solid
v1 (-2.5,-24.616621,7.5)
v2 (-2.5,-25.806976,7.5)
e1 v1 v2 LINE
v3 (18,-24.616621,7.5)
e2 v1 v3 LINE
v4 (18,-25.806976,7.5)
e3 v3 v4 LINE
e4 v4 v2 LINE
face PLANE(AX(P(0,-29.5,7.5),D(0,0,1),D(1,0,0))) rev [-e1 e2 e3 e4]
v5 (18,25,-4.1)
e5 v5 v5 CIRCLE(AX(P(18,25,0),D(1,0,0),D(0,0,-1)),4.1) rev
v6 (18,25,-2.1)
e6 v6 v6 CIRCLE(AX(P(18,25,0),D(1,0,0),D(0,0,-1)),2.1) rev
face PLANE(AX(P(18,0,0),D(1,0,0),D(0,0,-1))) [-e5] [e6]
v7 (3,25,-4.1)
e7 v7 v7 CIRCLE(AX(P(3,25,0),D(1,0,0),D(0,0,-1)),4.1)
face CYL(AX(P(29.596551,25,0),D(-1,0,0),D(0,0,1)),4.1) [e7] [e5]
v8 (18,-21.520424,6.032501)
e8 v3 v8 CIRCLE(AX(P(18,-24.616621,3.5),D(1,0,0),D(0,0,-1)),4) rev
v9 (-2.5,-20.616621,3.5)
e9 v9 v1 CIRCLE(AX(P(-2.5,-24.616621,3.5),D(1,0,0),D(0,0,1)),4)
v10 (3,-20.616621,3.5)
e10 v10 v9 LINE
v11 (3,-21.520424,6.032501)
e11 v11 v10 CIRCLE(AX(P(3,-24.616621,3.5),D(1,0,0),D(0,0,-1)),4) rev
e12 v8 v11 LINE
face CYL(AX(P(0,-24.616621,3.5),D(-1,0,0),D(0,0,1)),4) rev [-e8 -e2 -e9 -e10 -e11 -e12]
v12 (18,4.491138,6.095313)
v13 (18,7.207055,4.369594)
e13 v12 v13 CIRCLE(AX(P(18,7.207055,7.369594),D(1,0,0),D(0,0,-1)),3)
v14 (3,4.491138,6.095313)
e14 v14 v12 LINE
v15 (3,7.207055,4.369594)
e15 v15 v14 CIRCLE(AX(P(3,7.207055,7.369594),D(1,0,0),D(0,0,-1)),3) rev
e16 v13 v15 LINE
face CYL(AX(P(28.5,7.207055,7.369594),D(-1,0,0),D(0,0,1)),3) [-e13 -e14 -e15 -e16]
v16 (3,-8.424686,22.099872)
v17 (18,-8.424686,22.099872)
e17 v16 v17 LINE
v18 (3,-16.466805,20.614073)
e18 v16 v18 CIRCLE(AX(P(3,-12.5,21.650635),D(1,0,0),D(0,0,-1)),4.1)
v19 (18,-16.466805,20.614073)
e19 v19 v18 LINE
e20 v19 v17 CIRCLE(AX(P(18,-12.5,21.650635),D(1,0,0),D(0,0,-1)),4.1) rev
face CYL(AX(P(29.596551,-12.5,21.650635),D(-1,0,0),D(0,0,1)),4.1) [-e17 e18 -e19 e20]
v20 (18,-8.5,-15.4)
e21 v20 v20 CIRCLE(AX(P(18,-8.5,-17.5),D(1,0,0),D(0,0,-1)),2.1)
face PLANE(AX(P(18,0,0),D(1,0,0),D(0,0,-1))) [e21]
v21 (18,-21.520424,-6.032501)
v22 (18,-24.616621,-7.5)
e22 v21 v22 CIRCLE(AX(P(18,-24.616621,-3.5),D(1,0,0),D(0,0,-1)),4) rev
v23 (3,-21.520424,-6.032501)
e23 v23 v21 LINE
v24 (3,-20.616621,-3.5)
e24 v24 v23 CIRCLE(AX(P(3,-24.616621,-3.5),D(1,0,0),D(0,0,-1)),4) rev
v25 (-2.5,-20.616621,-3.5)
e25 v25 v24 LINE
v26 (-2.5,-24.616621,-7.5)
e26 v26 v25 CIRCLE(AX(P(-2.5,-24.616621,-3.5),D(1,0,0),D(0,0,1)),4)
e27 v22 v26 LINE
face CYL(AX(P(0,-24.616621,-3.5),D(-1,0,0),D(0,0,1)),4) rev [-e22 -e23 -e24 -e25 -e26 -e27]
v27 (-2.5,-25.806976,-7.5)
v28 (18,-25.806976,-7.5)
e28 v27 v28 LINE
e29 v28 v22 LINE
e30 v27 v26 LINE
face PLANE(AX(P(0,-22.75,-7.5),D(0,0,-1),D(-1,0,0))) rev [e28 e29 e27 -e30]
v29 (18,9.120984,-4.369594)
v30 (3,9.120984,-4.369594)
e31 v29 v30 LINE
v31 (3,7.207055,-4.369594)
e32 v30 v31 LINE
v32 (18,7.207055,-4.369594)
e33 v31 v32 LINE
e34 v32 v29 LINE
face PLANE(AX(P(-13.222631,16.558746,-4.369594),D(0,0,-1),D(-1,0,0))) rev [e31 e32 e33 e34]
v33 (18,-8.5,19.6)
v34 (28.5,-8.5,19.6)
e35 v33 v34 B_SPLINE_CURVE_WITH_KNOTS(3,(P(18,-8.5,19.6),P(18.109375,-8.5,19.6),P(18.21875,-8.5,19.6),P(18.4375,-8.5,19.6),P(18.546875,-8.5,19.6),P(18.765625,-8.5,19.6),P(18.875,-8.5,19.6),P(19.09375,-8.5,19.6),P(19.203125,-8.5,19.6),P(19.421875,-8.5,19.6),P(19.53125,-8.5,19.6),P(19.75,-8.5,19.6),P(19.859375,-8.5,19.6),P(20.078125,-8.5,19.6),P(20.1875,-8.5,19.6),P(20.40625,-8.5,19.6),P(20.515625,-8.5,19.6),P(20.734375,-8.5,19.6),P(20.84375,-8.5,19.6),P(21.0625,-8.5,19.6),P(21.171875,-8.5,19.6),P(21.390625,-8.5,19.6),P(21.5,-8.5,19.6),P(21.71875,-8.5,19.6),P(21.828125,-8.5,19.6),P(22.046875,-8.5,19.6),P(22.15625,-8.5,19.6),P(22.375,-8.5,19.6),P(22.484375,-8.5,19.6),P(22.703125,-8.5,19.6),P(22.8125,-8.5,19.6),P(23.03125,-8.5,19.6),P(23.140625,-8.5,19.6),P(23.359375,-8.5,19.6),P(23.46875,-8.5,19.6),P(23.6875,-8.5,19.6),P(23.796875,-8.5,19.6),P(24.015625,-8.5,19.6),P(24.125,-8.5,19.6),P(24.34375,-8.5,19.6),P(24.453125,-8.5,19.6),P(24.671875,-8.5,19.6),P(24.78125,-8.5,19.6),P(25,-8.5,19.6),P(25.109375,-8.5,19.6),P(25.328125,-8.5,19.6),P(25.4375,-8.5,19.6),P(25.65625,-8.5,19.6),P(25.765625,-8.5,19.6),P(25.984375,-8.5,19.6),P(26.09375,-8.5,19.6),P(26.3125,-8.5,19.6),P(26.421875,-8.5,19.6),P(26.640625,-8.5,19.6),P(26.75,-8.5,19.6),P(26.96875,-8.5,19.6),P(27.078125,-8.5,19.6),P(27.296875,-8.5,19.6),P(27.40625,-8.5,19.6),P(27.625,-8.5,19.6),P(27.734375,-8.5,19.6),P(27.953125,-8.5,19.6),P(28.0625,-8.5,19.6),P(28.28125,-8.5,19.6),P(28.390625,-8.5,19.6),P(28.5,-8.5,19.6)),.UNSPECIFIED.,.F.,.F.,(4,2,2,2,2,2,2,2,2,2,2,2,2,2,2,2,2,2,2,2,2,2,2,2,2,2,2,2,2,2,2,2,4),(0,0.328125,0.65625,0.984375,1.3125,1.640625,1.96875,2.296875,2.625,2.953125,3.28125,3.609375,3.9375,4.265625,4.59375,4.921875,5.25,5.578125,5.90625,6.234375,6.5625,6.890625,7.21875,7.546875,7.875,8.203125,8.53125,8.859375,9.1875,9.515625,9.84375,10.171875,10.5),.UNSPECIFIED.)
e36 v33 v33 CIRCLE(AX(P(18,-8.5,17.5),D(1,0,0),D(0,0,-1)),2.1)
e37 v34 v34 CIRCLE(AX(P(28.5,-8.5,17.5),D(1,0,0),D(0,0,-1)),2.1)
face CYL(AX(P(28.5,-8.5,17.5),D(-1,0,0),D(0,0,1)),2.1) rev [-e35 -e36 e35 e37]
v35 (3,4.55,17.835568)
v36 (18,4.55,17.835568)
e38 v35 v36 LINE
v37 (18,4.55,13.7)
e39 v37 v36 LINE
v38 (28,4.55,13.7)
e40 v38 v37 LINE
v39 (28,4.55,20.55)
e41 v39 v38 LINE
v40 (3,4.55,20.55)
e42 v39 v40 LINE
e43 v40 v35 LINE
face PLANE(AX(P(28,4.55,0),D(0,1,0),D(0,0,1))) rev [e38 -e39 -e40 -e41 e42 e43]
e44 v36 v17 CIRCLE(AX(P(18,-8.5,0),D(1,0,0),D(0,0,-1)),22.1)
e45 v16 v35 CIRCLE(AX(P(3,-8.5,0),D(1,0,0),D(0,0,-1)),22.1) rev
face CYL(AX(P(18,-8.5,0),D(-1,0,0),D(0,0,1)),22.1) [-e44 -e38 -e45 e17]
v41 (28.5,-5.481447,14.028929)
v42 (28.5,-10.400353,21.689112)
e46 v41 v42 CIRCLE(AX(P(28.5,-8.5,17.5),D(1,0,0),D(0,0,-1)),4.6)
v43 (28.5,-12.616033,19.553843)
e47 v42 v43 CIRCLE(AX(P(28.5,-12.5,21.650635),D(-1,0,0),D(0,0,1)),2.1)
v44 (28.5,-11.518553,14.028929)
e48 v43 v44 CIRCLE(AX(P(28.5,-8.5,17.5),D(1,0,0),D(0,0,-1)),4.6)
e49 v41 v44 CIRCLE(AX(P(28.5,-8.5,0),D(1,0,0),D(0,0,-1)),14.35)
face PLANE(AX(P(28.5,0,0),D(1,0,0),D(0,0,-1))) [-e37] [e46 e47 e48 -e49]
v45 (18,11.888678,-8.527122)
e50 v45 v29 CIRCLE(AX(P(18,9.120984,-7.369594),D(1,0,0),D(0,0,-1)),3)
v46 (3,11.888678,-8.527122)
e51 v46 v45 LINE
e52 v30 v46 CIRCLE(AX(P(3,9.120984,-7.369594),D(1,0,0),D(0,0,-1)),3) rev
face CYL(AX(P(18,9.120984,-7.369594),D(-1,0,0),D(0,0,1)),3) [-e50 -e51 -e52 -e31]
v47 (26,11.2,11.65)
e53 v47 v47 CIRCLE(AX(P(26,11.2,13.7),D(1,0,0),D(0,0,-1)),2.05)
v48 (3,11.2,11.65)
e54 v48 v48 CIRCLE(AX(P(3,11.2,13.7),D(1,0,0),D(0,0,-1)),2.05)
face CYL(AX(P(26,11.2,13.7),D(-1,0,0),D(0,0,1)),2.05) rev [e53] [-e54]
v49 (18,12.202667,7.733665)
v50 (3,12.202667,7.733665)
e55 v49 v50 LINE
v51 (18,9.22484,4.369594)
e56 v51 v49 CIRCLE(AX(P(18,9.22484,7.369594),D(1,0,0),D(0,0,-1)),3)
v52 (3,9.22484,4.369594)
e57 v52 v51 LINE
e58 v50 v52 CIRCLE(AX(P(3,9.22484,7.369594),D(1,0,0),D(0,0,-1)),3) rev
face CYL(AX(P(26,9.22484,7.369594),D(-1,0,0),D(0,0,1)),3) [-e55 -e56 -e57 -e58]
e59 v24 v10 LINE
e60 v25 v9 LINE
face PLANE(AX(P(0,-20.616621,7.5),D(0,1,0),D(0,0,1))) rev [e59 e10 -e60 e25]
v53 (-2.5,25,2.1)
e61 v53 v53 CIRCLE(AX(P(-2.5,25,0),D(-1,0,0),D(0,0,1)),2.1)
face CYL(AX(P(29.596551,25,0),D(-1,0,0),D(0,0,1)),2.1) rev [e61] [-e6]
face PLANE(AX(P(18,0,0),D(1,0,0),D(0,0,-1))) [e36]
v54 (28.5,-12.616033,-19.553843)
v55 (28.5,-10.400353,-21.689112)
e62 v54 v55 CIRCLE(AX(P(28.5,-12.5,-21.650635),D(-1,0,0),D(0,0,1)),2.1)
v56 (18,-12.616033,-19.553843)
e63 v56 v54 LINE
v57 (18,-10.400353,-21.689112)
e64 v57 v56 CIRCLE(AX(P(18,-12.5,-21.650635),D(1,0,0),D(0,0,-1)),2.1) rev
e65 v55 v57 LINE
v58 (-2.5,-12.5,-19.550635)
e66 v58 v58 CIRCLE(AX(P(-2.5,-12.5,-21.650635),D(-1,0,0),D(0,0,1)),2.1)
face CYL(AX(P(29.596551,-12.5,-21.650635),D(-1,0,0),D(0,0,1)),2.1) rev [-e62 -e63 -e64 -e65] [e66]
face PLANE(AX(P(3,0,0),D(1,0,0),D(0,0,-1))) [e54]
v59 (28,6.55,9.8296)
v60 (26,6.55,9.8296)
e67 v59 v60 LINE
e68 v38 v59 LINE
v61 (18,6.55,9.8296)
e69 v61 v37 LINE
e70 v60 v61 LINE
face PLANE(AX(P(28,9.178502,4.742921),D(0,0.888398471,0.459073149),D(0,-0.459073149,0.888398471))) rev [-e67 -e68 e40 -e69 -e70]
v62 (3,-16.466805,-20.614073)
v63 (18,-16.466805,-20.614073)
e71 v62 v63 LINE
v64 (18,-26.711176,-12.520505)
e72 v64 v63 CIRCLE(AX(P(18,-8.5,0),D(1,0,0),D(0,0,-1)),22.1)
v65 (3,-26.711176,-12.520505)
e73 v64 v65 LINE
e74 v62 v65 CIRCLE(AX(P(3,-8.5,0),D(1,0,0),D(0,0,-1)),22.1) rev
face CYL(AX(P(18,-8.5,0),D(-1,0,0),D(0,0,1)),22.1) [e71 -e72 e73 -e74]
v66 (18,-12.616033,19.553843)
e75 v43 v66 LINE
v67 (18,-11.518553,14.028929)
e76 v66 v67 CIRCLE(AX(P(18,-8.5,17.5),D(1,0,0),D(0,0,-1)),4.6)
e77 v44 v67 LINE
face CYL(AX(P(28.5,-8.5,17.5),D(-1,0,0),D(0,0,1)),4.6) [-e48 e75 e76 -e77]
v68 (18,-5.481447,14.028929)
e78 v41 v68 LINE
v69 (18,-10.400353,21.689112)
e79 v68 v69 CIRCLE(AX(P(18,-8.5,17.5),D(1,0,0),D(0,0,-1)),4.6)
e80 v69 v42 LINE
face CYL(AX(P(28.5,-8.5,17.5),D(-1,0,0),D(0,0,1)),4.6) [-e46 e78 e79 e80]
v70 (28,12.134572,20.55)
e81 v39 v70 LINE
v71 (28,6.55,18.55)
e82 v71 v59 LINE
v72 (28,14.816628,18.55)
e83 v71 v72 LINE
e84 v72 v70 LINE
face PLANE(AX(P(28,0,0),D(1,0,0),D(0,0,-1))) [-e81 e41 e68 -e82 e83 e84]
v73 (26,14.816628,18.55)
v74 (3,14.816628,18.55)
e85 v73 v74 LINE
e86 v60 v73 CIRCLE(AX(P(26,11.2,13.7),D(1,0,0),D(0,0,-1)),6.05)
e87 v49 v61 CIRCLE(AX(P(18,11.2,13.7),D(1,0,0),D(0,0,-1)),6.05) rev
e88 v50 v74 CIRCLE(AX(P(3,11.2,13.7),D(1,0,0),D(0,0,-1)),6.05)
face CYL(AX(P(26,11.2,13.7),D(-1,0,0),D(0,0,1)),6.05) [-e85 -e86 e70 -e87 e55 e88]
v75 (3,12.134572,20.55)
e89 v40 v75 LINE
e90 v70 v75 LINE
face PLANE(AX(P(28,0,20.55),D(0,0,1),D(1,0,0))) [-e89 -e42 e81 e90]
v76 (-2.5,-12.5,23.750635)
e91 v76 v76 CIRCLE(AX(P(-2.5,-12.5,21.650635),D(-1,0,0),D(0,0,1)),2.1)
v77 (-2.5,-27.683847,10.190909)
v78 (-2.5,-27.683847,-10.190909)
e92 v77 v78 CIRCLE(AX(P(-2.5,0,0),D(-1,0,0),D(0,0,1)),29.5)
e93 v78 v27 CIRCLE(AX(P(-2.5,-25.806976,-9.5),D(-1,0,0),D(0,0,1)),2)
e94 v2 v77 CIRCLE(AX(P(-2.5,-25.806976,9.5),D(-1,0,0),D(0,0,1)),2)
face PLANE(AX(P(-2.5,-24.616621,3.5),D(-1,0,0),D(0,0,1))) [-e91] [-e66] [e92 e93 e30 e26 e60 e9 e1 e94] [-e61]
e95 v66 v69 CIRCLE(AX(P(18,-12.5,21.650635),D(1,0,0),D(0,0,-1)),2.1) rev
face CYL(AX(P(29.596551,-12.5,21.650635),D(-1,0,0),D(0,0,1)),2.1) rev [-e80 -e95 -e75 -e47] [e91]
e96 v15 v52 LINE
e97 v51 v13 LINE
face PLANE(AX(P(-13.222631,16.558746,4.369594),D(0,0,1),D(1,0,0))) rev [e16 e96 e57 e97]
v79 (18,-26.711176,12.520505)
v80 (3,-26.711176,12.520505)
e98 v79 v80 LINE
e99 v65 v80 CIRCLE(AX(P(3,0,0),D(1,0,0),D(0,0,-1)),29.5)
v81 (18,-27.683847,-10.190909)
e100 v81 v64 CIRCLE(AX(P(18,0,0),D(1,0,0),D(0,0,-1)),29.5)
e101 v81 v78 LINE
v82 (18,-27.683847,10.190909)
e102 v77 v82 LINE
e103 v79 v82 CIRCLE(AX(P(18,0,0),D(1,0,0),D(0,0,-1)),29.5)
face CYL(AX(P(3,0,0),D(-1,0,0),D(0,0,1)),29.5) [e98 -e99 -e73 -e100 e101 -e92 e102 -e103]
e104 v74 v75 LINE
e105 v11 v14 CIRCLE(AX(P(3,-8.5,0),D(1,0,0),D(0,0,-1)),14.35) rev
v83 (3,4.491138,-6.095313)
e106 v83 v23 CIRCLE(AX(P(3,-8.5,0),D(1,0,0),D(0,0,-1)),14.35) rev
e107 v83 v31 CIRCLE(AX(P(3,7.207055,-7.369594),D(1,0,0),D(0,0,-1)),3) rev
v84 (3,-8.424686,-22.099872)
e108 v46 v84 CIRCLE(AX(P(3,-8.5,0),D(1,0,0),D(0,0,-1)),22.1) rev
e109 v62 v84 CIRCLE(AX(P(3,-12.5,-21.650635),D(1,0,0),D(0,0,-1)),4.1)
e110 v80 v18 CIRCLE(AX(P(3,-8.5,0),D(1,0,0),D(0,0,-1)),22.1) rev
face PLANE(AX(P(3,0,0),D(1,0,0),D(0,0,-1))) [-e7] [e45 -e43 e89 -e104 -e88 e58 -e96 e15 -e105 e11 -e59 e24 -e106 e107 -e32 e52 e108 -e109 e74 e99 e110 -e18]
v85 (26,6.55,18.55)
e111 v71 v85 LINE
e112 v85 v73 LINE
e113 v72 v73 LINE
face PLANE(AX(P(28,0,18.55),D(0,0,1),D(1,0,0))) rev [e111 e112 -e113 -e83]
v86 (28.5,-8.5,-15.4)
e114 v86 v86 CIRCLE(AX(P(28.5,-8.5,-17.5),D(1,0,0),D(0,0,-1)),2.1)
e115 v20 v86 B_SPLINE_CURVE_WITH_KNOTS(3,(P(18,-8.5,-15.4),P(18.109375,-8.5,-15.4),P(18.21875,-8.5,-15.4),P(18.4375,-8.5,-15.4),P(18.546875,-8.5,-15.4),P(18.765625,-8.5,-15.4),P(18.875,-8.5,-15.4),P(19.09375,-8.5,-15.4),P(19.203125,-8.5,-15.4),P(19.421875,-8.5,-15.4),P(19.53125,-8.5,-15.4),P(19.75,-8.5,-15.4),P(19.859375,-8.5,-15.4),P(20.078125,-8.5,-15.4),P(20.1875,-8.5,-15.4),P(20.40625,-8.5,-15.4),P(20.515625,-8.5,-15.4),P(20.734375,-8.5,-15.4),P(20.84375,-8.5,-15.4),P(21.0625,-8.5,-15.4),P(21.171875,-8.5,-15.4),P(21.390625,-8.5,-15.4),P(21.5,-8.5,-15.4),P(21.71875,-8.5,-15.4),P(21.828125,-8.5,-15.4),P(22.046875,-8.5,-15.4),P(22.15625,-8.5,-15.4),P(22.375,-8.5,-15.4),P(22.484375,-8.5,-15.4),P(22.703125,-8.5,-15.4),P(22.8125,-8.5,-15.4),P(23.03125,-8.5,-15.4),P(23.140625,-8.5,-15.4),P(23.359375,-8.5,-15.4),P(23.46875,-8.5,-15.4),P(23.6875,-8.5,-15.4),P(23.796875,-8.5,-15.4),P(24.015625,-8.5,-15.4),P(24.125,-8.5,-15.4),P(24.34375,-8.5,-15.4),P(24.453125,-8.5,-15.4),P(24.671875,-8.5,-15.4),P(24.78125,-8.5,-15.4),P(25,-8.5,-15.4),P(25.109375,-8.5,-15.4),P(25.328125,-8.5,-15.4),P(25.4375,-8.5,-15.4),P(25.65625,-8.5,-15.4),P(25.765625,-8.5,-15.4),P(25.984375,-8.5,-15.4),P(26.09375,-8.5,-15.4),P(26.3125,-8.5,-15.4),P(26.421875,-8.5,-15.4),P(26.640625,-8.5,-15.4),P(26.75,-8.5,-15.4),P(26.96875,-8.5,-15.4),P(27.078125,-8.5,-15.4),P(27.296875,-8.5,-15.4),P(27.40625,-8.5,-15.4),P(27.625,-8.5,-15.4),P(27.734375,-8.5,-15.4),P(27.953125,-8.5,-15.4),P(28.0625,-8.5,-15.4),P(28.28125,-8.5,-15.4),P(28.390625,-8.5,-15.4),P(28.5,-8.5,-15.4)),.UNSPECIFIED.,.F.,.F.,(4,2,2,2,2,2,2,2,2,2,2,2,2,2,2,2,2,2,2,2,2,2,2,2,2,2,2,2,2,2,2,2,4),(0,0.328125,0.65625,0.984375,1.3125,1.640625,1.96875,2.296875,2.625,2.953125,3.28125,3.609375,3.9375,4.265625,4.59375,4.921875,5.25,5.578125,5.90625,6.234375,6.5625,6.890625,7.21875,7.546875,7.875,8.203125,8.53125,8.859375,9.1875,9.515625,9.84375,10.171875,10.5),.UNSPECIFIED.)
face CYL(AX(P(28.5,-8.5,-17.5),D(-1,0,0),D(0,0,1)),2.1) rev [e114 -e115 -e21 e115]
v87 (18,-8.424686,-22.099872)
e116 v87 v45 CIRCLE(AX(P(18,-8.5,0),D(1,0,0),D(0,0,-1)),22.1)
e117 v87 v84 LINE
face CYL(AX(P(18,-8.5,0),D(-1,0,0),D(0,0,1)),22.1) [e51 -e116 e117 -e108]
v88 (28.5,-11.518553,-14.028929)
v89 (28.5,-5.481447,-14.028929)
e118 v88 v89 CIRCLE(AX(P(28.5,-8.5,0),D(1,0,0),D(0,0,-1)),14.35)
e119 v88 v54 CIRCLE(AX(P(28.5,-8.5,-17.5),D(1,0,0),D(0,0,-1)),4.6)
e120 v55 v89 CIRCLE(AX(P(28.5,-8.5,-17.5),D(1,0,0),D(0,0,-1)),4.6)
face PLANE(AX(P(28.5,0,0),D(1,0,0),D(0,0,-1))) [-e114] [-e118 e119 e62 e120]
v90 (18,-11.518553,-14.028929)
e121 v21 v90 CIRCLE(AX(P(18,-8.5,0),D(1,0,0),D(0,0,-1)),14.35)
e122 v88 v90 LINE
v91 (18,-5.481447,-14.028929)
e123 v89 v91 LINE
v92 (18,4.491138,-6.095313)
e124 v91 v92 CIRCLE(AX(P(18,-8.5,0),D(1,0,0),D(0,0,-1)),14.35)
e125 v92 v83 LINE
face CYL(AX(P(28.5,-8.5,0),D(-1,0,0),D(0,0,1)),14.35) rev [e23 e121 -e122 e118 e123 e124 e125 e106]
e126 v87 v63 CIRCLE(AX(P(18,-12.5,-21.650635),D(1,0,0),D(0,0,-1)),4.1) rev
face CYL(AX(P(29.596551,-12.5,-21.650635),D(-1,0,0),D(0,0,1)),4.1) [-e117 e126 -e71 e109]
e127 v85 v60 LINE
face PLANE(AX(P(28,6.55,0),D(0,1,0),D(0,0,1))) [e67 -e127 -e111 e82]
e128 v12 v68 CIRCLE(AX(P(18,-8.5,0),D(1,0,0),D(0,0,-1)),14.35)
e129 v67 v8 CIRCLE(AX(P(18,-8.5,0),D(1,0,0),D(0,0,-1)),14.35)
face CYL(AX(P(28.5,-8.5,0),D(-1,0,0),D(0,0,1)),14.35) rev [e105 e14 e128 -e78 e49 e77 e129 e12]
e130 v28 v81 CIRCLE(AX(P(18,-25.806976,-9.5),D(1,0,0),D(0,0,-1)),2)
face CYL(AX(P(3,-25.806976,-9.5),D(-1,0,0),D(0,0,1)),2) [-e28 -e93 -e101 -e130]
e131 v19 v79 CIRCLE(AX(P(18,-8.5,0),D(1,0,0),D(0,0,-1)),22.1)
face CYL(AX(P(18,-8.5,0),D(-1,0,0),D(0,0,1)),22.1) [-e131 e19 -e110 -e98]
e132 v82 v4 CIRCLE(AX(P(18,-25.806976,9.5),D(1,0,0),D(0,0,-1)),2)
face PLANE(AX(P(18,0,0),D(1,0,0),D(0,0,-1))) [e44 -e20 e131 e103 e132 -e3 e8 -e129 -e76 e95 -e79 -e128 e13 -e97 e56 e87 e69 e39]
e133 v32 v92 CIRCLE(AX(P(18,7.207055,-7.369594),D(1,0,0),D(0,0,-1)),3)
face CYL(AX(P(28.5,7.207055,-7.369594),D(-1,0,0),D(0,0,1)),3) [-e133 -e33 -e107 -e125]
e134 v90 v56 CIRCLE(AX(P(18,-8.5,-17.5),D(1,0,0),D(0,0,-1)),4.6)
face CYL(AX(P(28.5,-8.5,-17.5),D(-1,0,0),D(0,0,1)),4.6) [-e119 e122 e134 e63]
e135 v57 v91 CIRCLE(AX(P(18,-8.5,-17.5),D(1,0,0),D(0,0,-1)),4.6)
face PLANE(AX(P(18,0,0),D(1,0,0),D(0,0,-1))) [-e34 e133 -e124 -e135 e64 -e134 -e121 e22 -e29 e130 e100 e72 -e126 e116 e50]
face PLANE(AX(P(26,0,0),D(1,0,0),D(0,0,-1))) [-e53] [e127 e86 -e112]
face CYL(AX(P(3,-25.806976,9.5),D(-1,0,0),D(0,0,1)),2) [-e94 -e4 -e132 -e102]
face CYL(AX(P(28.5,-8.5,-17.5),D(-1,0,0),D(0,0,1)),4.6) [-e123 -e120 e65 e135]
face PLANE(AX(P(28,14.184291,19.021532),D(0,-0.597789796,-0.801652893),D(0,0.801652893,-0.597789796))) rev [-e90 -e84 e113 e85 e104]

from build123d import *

# Parameters (mm, degrees)
SKETCH1_R            = 29.5
BOSS_EXTRUDE1_DEPTH  = 3
SKETCH1_3_R          = 2.1
BOSS_EXTRUDE2_DEPTH  = 28.5
SKETCH1_4_R          = 2.1
BOSS_EXTRUDE3_DEPTH  = 18
BOSS_EXTRUDE4_DEPTH  = 18
SKETCH3_R            = 4.1
SKETCH3_R_2          = 2.1
BOSS_EXTRUDE5_DEPTH  = 18
SKETCH3_2_R          = 2.1
CUT_EXTRUDE1_DEPTH   = 51.524746412
CUT_EXTRUDE4_DEPTH   = 46.436769251
FILLET1_R            = 4
FILLET2_R            = 2
BOSS_EXTRUDE6_START  = 2.5
SKETCH5_R            = 2.1
BOSS_EXTRUDE6_DEPTH  = 2.5
BOSS_EXTRUDE8_DEPTH  = 23
BOSS_EXTRUDE10_DEPTH = 25
CUT_EXTRUDE5_START   = -23
SKETCH8_R            = 2.05
CUT_EXTRUDE5_DEPTH   = 23
SKETCH9_W            = 8.73918865
SKETCH9_H            = 13.66749207
CUT_EXTRUDE6_DEPTH   = 15
FILLET6_R            = 3


with BuildPart() as part:
    # Sketch1 → Boss-Extrude1 (new body)
    with BuildSketch(Plane(origin=(0, 0, 0), x_dir=(0, 0, -1), z_dir=(1, 0, 0))):
        Circle(SKETCH1_R)
    extrude(amount=BOSS_EXTRUDE1_DEPTH)

    # Sketch1<3> → Boss-Extrude2 (add)
    # profile 1 of 2: a face of its own
    with BuildSketch(Plane(origin=(0, 0, 0), x_dir=(0, 0, -1), z_dir=(1, 0, 0))):
        with BuildLine():
            ThreePointArc((-14.028928571, -5.481446847), (-22.1, -8.5), (-14.028928571, -11.518553153))
            ThreePointArc((-14.028928571, -11.518553153), (-14.35, -8.5), (-14.028928571, -5.481446847))
        make_face()
        with Locations(Location((-17.5, -8.5, 0), (0, 0, 180))):
            Circle(SKETCH1_3_R, mode=Mode.SUBTRACT)
    # profile 2 of 2: a face of its own
    with BuildSketch(Plane(origin=(0, 0, 0), x_dir=(0, 0, -1), z_dir=(1, 0, 0))):
        with BuildLine():
            ThreePointArc((14.028928571, -11.518553153), (22.1, -8.5), (14.028928571, -5.481446847))
            ThreePointArc((14.028928571, -5.481446847), (14.35, -8.5), (14.028928571, -11.518553153))
        make_face()
        with Locations(Location((17.5, -8.5, 0), (0, 0, 180))):
            Circle(SKETCH1_3_R, mode=Mode.SUBTRACT)
    extrude(amount=BOSS_EXTRUDE2_DEPTH)

    # Sketch1<4> → Boss-Extrude3 (add)
    with BuildSketch(Plane(origin=(0, 0, 0), x_dir=(0, 0, -1), z_dir=(1, 0, 0))):
        with BuildLine():
            ThreePointArc((-22.1, -8.5), (-19.559053733, -18.788508981), (-12.520505244, -26.711176471))
            ThreePointArc((-12.520505244, -26.711176471), (0, -29.5), (12.520505244, -26.711176471))
            ThreePointArc((12.520505244, -26.711176471), (19.559053733, -18.788508981), (22.1, -8.5))
            ThreePointArc((22.1, -8.5), (19.111376962, -12.808533891), (14.028928571, -11.518553153))
            ThreePointArc((14.028928571, -11.518553153), (0, -22.85), (-14.028928571, -11.518553153))
            ThreePointArc((-14.028928571, -11.518553153), (-19.111376962, -12.808533891), (-22.1, -8.5))
        make_face()
        with Locations((-17.5, -8.5)):
            Circle(SKETCH1_4_R)
        with Locations((17.5, -8.5)):
            Circle(SKETCH1_4_R)
    extrude(amount=BOSS_EXTRUDE3_DEPTH)

    # Sketch1<5> → Boss-Extrude4 (add)
    with BuildSketch(Plane(origin=(0, 0, 0), x_dir=(0, 0, -1), z_dir=(1, 0, 0))):
        with BuildLine():
            ThreePointArc((22.1, -8.5), (0, 13.6), (-22.1, -8.5))
            ThreePointArc((-22.1, -8.5), (-19.111376962, -4.191466109), (-14.028928571, -5.481446847))
            ThreePointArc((-14.028928571, -5.481446847), (0, 5.85), (14.028928571, -5.481446847))
            ThreePointArc((14.028928571, -5.481446847), (19.111376962, -4.191466109), (22.1, -8.5))
        make_face()
    extrude(amount=BOSS_EXTRUDE4_DEPTH)

    # Sketch3 → Boss-Extrude5 (add)
    # profile 1 of 3: a face of its own
    with BuildSketch(Plane.ZY):
        with Locations(Location((0, 25, 0), (0, 0, 180))):
            Circle(SKETCH3_R)
        with Locations(Location((0, 25, 0), (0, 0, 180))):
            Circle(SKETCH3_R_2, mode=Mode.SUBTRACT)
    # profile 2 of 3: a face of its own
    with BuildSketch(Plane.ZY):
        with Locations((21.650635095, -12.5)):
            Circle(SKETCH3_R)
        with Locations((21.650635095, -12.5)):
            Circle(SKETCH3_R_2, mode=Mode.SUBTRACT)
    # profile 3 of 3: a face of its own
    with BuildSketch(Plane.ZY):
        with Locations((-21.650635095, -12.5)):
            Circle(SKETCH3_R)
        with Locations((-21.650635095, -12.5)):
            Circle(SKETCH3_R_2, mode=Mode.SUBTRACT)
    extrude(amount=-BOSS_EXTRUDE5_DEPTH)

    # Sketch3<2> → Cut-Extrude1 (cut, through all)
    with BuildSketch(Plane.ZY):
        with Locations((-21.650635095, -12.5)):
            Circle(SKETCH3_2_R)
        with BuildLine():
            ThreePointArc((0, 27.1), (-2.1, 25), (0, 22.9))
            Line((0, 22.9), (0, 27.1))
        make_face()
        with BuildLine():
            Line((0, 27.1), (0, 22.9))
            ThreePointArc((0, 22.9), (1.48492424, 23.51507576), (2.1, 25))
            ThreePointArc((2.1, 25), (1.48492424, 26.48492424), (0, 27.1))
        make_face()
        with Locations((21.650635095, -12.5)):
            Circle(SKETCH3_2_R)
    extrude(amount=-CUT_EXTRUDE1_DEPTH, mode=Mode.SUBTRACT)

    # Sketch4 → Cut-Extrude4 (cut, through all)
    with BuildSketch(Plane(origin=(18, 0, 0), x_dir=(0, 0, -1), z_dir=(1, 0, 0))):
        Polygon((-7.5, -22.75), (-7.5, -29.5), (-7.5, -30.430558557), (7.5, -30.430558557), (7.5, -29.5), (7.5, -22.75), (7.5, -20.616620816), (-7.5, -20.616620816), align=None)
    extrude(amount=-CUT_EXTRUDE4_DEPTH, mode=Mode.SUBTRACT)

    # Fillet1
    # the kernel refuses this fillet: 4 mm, written as the material it adds along each edge
    with BuildSketch(Plane(origin=(27, -20.616620816, -7.5), x_dir=(0, 0, 1), z_dir=(-1, 0, 0))) as fillet1_piece_1_section:
        with BuildLine():
            CenterArc((FILLET1_R, -FILLET1_R), FILLET1_R, 90, 90)
            Line((0, -FILLET1_R), (-FILLET1_R * 0.02, -FILLET1_R))
            Line((-FILLET1_R * 0.02, -FILLET1_R), (-FILLET1_R * 0.02, FILLET1_R * 0.02))
            Line((-FILLET1_R * 0.02, FILLET1_R * 0.02), (FILLET1_R, FILLET1_R * 0.02))
            Line((FILLET1_R, FILLET1_R * 0.02), (FILLET1_R, 0))
        make_face()
    fillet1_piece_1 = extrude(amount=27, mode=Mode.PRIVATE)
    fillet1_piece_1 = split(fillet1_piece_1, bisect_by=Plane(origin=(3, -22.074099396, -7.128838898), z_dir=(1, 0, 0)), keep=Keep.TOP, mode=Mode.PRIVATE)
    fillet1_piece_1 = fillet1_piece_1 - Plane(origin=(10.5, -8.5, 0), x_dir=(0, 0.21035213610066375, -0.9776256844201097), z_dir=(-1, 0, 0)) * Cylinder(14.35, 70, mode=Mode.PRIVATE)
    fillet1_piece_1 = split(fillet1_piece_1, bisect_by=Plane(origin=(18, -22.074099396, -7.128838898), z_dir=(-1, 0, 0)), keep=Keep.TOP, mode=Mode.PRIVATE)
    add(fillet1_piece_1)
    with BuildSketch(Plane(origin=(3, -20.616620816, -7.5), x_dir=(0, 0, 1), z_dir=(-1, 0, 0))) as fillet1_piece_2_section:
        with BuildLine():
            CenterArc((FILLET1_R, -FILLET1_R), FILLET1_R, 90, 90)
            Line((0, -FILLET1_R), (-FILLET1_R * 0.02, -FILLET1_R))
            Line((-FILLET1_R * 0.02, -FILLET1_R), (-FILLET1_R * 0.02, FILLET1_R * 0.02))
            Line((-FILLET1_R * 0.02, FILLET1_R * 0.02), (FILLET1_R, FILLET1_R * 0.02))
            Line((FILLET1_R, FILLET1_R * 0.02), (FILLET1_R, 0))
        make_face()
    fillet1_piece_2 = extrude(amount=3, mode=Mode.PRIVATE)
    fillet1_piece_2 = fillet1_piece_2 & Plane(origin=(1.5, -8.5, 0), x_dir=(0, 0.21035213610066375, -0.9776256844201097), z_dir=(-1, 0, 0)) * Cylinder(14.35, 22, mode=Mode.PRIVATE)
    add(fillet1_piece_2)
    with BuildSketch(Plane(origin=(3, -20.616620816, -7.5), x_dir=(0, 0, 1), z_dir=(-1, 0, 0))) as fillet1_piece_3_section:
        with BuildLine():
            CenterArc((FILLET1_R, -FILLET1_R), FILLET1_R, 90, 90)
            Line((0, -FILLET1_R), (-FILLET1_R * 0.02, -FILLET1_R))
            Line((-FILLET1_R * 0.02, -FILLET1_R), (-FILLET1_R * 0.02, FILLET1_R * 0.02))
            Line((-FILLET1_R * 0.02, FILLET1_R * 0.02), (FILLET1_R, FILLET1_R * 0.02))
            Line((FILLET1_R, FILLET1_R * 0.02), (FILLET1_R, 0))
        make_face()
    fillet1_piece_3 = extrude(amount=3, mode=Mode.PRIVATE)
    fillet1_piece_3 = fillet1_piece_3 - Plane(origin=(1.5, -8.5, 0), x_dir=(0, 0.21035213610066375, -0.9776256844201097), z_dir=(-1, 0, 0)) * Cylinder(14.35, 22, mode=Mode.PRIVATE)
    add(fillet1_piece_3)
    with BuildSketch(Plane(origin=(27, -20.616620816, 7.5), x_dir=(0, -1, 0), z_dir=(-1, 0, 0))) as fillet1_piece_4_section:
        with BuildLine():
            CenterArc((FILLET1_R, -FILLET1_R), FILLET1_R, 90, 90)
            Line((0, -FILLET1_R), (-FILLET1_R * 0.02, -FILLET1_R))
            Line((-FILLET1_R * 0.02, -FILLET1_R), (-FILLET1_R * 0.02, FILLET1_R * 0.02))
            Line((-FILLET1_R * 0.02, FILLET1_R * 0.02), (FILLET1_R, FILLET1_R * 0.02))
            Line((FILLET1_R, FILLET1_R * 0.02), (FILLET1_R, 0))
        make_face()
    fillet1_piece_4 = extrude(amount=27, mode=Mode.PRIVATE)
    fillet1_piece_4 = split(fillet1_piece_4, bisect_by=Plane(origin=(3, -22.074099396, 7.128838898), z_dir=(1, 0, 0)), keep=Keep.TOP, mode=Mode.PRIVATE)
    fillet1_piece_4 = fillet1_piece_4 - Plane(origin=(10.5, -8.5, 0), x_dir=(0, 0.21035213610066375, -0.9776256844201097), z_dir=(-1, 0, 0)) * Cylinder(14.35, 70, mode=Mode.PRIVATE)
    fillet1_piece_4 = split(fillet1_piece_4, bisect_by=Plane(origin=(18, -22.074099396, 7.128838898), z_dir=(-1, 0, 0)), keep=Keep.TOP, mode=Mode.PRIVATE)
    add(fillet1_piece_4)
    with BuildSketch(Plane(origin=(3, -20.616620816, 7.5), x_dir=(0, -1, 0), z_dir=(-1, 0, 0))) as fillet1_piece_5_section:
        with BuildLine():
            CenterArc((FILLET1_R, -FILLET1_R), FILLET1_R, 90, 90)
            Line((0, -FILLET1_R), (-FILLET1_R * 0.02, -FILLET1_R))
            Line((-FILLET1_R * 0.02, -FILLET1_R), (-FILLET1_R * 0.02, FILLET1_R * 0.02))
            Line((-FILLET1_R * 0.02, FILLET1_R * 0.02), (FILLET1_R, FILLET1_R * 0.02))
            Line((FILLET1_R, FILLET1_R * 0.02), (FILLET1_R, 0))
        make_face()
    fillet1_piece_5 = extrude(amount=3, mode=Mode.PRIVATE)
    fillet1_piece_5 = fillet1_piece_5 - Plane(origin=(1.5, -8.5, 0), x_dir=(0, 0.21035213610066375, -0.9776256844201097), z_dir=(-1, 0, 0)) * Cylinder(14.35, 22, mode=Mode.PRIVATE)
    add(fillet1_piece_5)
    with BuildSketch(Plane(origin=(3, -20.616620816, 7.5), x_dir=(0, -1, 0), z_dir=(-1, 0, 0))) as fillet1_piece_6_section:
        with BuildLine():
            CenterArc((FILLET1_R, -FILLET1_R), FILLET1_R, 90, 90)
            Line((0, -FILLET1_R), (-FILLET1_R * 0.02, -FILLET1_R))
            Line((-FILLET1_R * 0.02, -FILLET1_R), (-FILLET1_R * 0.02, FILLET1_R * 0.02))
            Line((-FILLET1_R * 0.02, FILLET1_R * 0.02), (FILLET1_R, FILLET1_R * 0.02))
            Line((FILLET1_R, FILLET1_R * 0.02), (FILLET1_R, 0))
        make_face()
    fillet1_piece_6 = extrude(amount=3, mode=Mode.PRIVATE)
    fillet1_piece_6 = fillet1_piece_6 & Plane(origin=(1.5, -8.5, 0), x_dir=(0, 0.21035213610066375, -0.9776256844201097), z_dir=(-1, 0, 0)) * Cylinder(14.35, 22, mode=Mode.PRIVATE)
    add(fillet1_piece_6)

    # Fillet2
    fillet2_edges = [part.edges().sort_by_distance(p)[0] for p in [
        (10.5, -28.530685235, -7.5),
        (10.5, -28.530685235, 7.5),
    ]]
    fillet(fillet2_edges, radius=FILLET2_R)

    # Sketch5 → Boss-Extrude6 (add)
    with BuildSketch(Plane.ZY.offset(BOSS_EXTRUDE6_START)):
        with BuildLine():
            Line((7.5, -24.616620816), (7.5, -25.806975801))
            ThreePointArc((7.5, -25.806975801), (8.355844893, -27.447374866), (10.190909091, -27.683846768))
            ThreePointArc((10.190909091, -27.683846768), (0, 29.5), (-10.190909091, -27.683846768))
            ThreePointArc((-10.190909091, -27.683846768), (-8.355844893, -27.447374866), (-7.5, -25.806975801))
            Line((-7.5, -25.806975801), (-7.5, -24.616620816))
            ThreePointArc((-7.5, -24.616620816), (-6.328427125, -21.788193691), (-3.5, -20.616620816))
            Line((-3.5, -20.616620816), (3.5, -20.616620816))
            ThreePointArc((3.5, -20.616620816), (6.328427125, -21.788193691), (7.5, -24.616620816))
        make_face()
        with Locations((21.650635095, -12.5)):
            Circle(SKETCH5_R, mode=Mode.SUBTRACT)
        with Locations((0, 25)):
            Circle(SKETCH5_R, mode=Mode.SUBTRACT)
        with Locations((-21.650635095, -12.5)):
            Circle(SKETCH5_R, mode=Mode.SUBTRACT)
    extrude(amount=-BOSS_EXTRUDE6_DEPTH)

    # Sketch7 → Boss-Extrude8 (add)
    with BuildSketch(Plane(origin=(3, 0, 0), x_dir=(0, 0, -1), z_dir=(1, 0, 0))):
        with BuildLine():
            Line((-18.55, 14.816628264), (-18.55, 11.2))
            Line((-18.55, 11.2), (-18.55, 6.55))
            Line((-18.55, 6.55), (-16.183556469, 6.55))
            ThreePointArc((-16.183556469, 6.55), (-14.76450438, 7.944434025), (-13.225798316, 9.205599648))
            ThreePointArc((-13.225798316, 9.205599648), (-15.308510717, 12.470902543), (-11.65, 11.2))
            ThreePointArc((-11.65, 11.2), (-11.738234617, 10.60504069), (-11.995343005, 10.061296996))
            ThreePointArc((-11.995343005, 10.061296996), (-10.894985533, 10.727825936), (-9.757708838, 11.329198628))
            ThreePointArc((-9.757708838, 11.329198628), (-8.756584544, 11.791185947), (-7.73366458, 12.202667272))
            ThreePointArc((-7.73366458, 12.202667272), (-12.27882119, 17.080710058), (-18.55, 14.816628264))
        make_face()
        with BuildLine():
            ThreePointArc((-13.225798316, 9.205599648), (-14.76450438, 7.944434025), (-16.183556469, 6.55))
            Line((-16.183556469, 6.55), (-13.7, 6.55))
            Line((-13.7, 6.55), (-9.829599504, 6.55))
            ThreePointArc((-9.829599504, 6.55), (-8.027389914, 9.096670542), (-7.73366458, 12.202667272))
            ThreePointArc((-7.73366458, 12.202667272), (-8.756584544, 11.791185947), (-9.757708838, 11.329198628))
            ThreePointArc((-9.757708838, 11.329198628), (-10.894985533, 10.727825936), (-11.995343005, 10.061296996))
            ThreePointArc((-11.995343005, 10.061296996), (-12.529568125, 9.516970224), (-13.225798316, 9.205599648))
        make_face()
    extrude(amount=BOSS_EXTRUDE8_DEPTH)

    # Sketch7<4> → Boss-Extrude10 (add)
    with BuildSketch(Plane(origin=(3, 0, 0), x_dir=(0, 0, -1), z_dir=(1, 0, 0))):
        with BuildLine():
            Line((-18.55, 6.55), (-18.55, 11.2))
            Line((-18.55, 11.2), (-18.55, 14.816628264))
            Line((-18.55, 14.816628264), (-20.55, 12.134572135))
            Line((-20.55, 12.134572135), (-20.55, 11.2))
            Line((-20.55, 11.2), (-20.55, 4.55))
            Line((-20.55, 4.55), (-17.835568396, 4.55))
            ThreePointArc((-17.835568396, 4.55), (-17.038932307, 5.574259691), (-16.183556469, 6.55))
            Line((-16.183556469, 6.55), (-18.55, 6.55))
        make_face()
        with BuildLine():
            Line((-13.7, 6.55), (-16.183556469, 6.55))
            ThreePointArc((-16.183556469, 6.55), (-17.038932307, 5.574259691), (-17.835568396, 4.55))
            Line((-17.835568396, 4.55), (-13.7, 4.55))
            Line((-13.7, 4.55), (-9.829599504, 6.55))
            Line((-9.829599504, 6.55), (-13.7, 6.55))
        make_face()
    extrude(amount=BOSS_EXTRUDE10_DEPTH)

    # Sketch8 → Cut-Extrude5 (cut)
    with BuildSketch(Plane(origin=(26, 0, 0), x_dir=(0, 0, -1), z_dir=(1, 0, 0)).offset(CUT_EXTRUDE5_START)):
        with Locations((-13.7, 11.2)):
            Circle(SKETCH8_R)
    extrude(amount=CUT_EXTRUDE5_DEPTH, mode=Mode.SUBTRACT)

    # Sketch9 → Cut-Extrude6 (cut)
    with BuildSketch(Plane(origin=(18, 0, 0), x_dir=(0, 0, -1), z_dir=(1, 0, 0))):
        with Locations((0, 9.725)):
            Rectangle(SKETCH9_W, SKETCH9_H)
    extrude(amount=-CUT_EXTRUDE6_DEPTH, mode=Mode.SUBTRACT)

    # Fillet6
    # the kernel refuses this fillet: 3 mm, written as the material it takes off along each edge
    with BuildSketch(Plane(origin=(23.096273111, 5.168545842, 4.369594325), x_dir=(0, -0.36539404448262197, 0.9308529380394261), z_dir=(-1, 0, 0))) as fillet6_piece_1:
        with BuildLine():
            CenterArc((2.047699677, 2.993734453), FILLET6_R, 201.431834882, 64.86449649)
            Line((-0.744859137, 1.897552319), (-0.800710314, 1.875628677))
            Line((-0.800710314, 1.875628677), (-0.055851176, -0.021923643))
            Line((-0.055851176, -0.021923643), (0.003875772, -0.059874689))
            ThreePointArc((0.003875772, -0.059874689), (0.926955532, -0.030029799), (1.850035291, -0.059874689))
            Line((1.850035291, -0.059874689), (1.853911064, 0))
        make_face()
    extrude(amount=20.096273111, mode=Mode.SUBTRACT)
    with BuildSketch(Plane(origin=(23.096273111, 5.168545842, -4.369594325), x_dir=(0, -0.3653940444826167, -0.9308529380394283), z_dir=(-1, 0, 0))) as fillet6_piece_2:
        with BuildLine():
            CenterArc((2.047699677, -2.993734453), FILLET6_R, 93.703668629, 64.86449649)
            Line((-0.744859137, -1.897552319), (-0.800710314, -1.875628677))
            Line((-0.800710314, -1.875628677), (-0.055851176, 0.021923643))
            Line((-0.055851176, 0.021923643), (0.003875772, 0.059874689))
            ThreePointArc((0.003875772, 0.059874689), (0.926955532, 0.030029799), (1.850035291, 0.059874689))
            Line((1.850035291, 0.059874689), (1.853911064, 0))
        make_face()
    extrude(amount=20.096273111, mode=Mode.SUBTRACT)
    with BuildSketch(Plane(origin=(28.87162696, 13.163717258, -4.369594325), x_dir=(0, -0.2932034375613946, -0.9560500741081408), z_dir=(-1, 0, 0))) as fillet6_piece_3:
        with BuildLine():
            CenterArc((4.053493491, 2.985445054), FILLET6_R, 162.950161155, 112.696062027)
            Line((1.185343269, 3.865055367), (1.127980264, 3.882647573))
            Line((1.127980264, 3.882647573), (-0.057363004, 0.017592206))
            Line((-0.057363004, 0.017592206), (-0.005903146, -0.059708901))
            ThreePointArc((-0.005903146, -0.059708901), (2.174325392, -0.167221433), (4.35455393, -0.059708901))
            Line((4.35455393, -0.059708901), (4.348650784, 0))
        make_face()
    extrude(amount=25.87162696, mode=Mode.SUBTRACT)
    with BuildSketch(Plane(origin=(27.847192133, 13.163717258, 4.369594325), x_dir=(0, -0.27469128210883176, 0.9615324745079628), z_dir=(-1, 0, 0))) as fillet6_piece_4:
        with BuildLine():
            CenterArc((3.966572556, -2.963284161), FILLET6_R, 98.973206407, 96.970411036)
            Line((1.081975133, -3.787358007), (1.024283184, -3.803839484))
            Line((1.024283184, -3.803839484), (-0.057691948, -0.016481477))
            Line((-0.057691948, -0.016481477), (-0.004749305, 0.059811739))
            ThreePointArc((-0.004749305, 0.059811739), (1.749327425, 0.12934287), (3.489296496, 0.059265683))
            Line((3.489296496, 0.059265683), (3.49865485, 0))
        make_face()
    extrude(amount=24.847192133, mode=Mode.SUBTRACT)


solid = part.part
